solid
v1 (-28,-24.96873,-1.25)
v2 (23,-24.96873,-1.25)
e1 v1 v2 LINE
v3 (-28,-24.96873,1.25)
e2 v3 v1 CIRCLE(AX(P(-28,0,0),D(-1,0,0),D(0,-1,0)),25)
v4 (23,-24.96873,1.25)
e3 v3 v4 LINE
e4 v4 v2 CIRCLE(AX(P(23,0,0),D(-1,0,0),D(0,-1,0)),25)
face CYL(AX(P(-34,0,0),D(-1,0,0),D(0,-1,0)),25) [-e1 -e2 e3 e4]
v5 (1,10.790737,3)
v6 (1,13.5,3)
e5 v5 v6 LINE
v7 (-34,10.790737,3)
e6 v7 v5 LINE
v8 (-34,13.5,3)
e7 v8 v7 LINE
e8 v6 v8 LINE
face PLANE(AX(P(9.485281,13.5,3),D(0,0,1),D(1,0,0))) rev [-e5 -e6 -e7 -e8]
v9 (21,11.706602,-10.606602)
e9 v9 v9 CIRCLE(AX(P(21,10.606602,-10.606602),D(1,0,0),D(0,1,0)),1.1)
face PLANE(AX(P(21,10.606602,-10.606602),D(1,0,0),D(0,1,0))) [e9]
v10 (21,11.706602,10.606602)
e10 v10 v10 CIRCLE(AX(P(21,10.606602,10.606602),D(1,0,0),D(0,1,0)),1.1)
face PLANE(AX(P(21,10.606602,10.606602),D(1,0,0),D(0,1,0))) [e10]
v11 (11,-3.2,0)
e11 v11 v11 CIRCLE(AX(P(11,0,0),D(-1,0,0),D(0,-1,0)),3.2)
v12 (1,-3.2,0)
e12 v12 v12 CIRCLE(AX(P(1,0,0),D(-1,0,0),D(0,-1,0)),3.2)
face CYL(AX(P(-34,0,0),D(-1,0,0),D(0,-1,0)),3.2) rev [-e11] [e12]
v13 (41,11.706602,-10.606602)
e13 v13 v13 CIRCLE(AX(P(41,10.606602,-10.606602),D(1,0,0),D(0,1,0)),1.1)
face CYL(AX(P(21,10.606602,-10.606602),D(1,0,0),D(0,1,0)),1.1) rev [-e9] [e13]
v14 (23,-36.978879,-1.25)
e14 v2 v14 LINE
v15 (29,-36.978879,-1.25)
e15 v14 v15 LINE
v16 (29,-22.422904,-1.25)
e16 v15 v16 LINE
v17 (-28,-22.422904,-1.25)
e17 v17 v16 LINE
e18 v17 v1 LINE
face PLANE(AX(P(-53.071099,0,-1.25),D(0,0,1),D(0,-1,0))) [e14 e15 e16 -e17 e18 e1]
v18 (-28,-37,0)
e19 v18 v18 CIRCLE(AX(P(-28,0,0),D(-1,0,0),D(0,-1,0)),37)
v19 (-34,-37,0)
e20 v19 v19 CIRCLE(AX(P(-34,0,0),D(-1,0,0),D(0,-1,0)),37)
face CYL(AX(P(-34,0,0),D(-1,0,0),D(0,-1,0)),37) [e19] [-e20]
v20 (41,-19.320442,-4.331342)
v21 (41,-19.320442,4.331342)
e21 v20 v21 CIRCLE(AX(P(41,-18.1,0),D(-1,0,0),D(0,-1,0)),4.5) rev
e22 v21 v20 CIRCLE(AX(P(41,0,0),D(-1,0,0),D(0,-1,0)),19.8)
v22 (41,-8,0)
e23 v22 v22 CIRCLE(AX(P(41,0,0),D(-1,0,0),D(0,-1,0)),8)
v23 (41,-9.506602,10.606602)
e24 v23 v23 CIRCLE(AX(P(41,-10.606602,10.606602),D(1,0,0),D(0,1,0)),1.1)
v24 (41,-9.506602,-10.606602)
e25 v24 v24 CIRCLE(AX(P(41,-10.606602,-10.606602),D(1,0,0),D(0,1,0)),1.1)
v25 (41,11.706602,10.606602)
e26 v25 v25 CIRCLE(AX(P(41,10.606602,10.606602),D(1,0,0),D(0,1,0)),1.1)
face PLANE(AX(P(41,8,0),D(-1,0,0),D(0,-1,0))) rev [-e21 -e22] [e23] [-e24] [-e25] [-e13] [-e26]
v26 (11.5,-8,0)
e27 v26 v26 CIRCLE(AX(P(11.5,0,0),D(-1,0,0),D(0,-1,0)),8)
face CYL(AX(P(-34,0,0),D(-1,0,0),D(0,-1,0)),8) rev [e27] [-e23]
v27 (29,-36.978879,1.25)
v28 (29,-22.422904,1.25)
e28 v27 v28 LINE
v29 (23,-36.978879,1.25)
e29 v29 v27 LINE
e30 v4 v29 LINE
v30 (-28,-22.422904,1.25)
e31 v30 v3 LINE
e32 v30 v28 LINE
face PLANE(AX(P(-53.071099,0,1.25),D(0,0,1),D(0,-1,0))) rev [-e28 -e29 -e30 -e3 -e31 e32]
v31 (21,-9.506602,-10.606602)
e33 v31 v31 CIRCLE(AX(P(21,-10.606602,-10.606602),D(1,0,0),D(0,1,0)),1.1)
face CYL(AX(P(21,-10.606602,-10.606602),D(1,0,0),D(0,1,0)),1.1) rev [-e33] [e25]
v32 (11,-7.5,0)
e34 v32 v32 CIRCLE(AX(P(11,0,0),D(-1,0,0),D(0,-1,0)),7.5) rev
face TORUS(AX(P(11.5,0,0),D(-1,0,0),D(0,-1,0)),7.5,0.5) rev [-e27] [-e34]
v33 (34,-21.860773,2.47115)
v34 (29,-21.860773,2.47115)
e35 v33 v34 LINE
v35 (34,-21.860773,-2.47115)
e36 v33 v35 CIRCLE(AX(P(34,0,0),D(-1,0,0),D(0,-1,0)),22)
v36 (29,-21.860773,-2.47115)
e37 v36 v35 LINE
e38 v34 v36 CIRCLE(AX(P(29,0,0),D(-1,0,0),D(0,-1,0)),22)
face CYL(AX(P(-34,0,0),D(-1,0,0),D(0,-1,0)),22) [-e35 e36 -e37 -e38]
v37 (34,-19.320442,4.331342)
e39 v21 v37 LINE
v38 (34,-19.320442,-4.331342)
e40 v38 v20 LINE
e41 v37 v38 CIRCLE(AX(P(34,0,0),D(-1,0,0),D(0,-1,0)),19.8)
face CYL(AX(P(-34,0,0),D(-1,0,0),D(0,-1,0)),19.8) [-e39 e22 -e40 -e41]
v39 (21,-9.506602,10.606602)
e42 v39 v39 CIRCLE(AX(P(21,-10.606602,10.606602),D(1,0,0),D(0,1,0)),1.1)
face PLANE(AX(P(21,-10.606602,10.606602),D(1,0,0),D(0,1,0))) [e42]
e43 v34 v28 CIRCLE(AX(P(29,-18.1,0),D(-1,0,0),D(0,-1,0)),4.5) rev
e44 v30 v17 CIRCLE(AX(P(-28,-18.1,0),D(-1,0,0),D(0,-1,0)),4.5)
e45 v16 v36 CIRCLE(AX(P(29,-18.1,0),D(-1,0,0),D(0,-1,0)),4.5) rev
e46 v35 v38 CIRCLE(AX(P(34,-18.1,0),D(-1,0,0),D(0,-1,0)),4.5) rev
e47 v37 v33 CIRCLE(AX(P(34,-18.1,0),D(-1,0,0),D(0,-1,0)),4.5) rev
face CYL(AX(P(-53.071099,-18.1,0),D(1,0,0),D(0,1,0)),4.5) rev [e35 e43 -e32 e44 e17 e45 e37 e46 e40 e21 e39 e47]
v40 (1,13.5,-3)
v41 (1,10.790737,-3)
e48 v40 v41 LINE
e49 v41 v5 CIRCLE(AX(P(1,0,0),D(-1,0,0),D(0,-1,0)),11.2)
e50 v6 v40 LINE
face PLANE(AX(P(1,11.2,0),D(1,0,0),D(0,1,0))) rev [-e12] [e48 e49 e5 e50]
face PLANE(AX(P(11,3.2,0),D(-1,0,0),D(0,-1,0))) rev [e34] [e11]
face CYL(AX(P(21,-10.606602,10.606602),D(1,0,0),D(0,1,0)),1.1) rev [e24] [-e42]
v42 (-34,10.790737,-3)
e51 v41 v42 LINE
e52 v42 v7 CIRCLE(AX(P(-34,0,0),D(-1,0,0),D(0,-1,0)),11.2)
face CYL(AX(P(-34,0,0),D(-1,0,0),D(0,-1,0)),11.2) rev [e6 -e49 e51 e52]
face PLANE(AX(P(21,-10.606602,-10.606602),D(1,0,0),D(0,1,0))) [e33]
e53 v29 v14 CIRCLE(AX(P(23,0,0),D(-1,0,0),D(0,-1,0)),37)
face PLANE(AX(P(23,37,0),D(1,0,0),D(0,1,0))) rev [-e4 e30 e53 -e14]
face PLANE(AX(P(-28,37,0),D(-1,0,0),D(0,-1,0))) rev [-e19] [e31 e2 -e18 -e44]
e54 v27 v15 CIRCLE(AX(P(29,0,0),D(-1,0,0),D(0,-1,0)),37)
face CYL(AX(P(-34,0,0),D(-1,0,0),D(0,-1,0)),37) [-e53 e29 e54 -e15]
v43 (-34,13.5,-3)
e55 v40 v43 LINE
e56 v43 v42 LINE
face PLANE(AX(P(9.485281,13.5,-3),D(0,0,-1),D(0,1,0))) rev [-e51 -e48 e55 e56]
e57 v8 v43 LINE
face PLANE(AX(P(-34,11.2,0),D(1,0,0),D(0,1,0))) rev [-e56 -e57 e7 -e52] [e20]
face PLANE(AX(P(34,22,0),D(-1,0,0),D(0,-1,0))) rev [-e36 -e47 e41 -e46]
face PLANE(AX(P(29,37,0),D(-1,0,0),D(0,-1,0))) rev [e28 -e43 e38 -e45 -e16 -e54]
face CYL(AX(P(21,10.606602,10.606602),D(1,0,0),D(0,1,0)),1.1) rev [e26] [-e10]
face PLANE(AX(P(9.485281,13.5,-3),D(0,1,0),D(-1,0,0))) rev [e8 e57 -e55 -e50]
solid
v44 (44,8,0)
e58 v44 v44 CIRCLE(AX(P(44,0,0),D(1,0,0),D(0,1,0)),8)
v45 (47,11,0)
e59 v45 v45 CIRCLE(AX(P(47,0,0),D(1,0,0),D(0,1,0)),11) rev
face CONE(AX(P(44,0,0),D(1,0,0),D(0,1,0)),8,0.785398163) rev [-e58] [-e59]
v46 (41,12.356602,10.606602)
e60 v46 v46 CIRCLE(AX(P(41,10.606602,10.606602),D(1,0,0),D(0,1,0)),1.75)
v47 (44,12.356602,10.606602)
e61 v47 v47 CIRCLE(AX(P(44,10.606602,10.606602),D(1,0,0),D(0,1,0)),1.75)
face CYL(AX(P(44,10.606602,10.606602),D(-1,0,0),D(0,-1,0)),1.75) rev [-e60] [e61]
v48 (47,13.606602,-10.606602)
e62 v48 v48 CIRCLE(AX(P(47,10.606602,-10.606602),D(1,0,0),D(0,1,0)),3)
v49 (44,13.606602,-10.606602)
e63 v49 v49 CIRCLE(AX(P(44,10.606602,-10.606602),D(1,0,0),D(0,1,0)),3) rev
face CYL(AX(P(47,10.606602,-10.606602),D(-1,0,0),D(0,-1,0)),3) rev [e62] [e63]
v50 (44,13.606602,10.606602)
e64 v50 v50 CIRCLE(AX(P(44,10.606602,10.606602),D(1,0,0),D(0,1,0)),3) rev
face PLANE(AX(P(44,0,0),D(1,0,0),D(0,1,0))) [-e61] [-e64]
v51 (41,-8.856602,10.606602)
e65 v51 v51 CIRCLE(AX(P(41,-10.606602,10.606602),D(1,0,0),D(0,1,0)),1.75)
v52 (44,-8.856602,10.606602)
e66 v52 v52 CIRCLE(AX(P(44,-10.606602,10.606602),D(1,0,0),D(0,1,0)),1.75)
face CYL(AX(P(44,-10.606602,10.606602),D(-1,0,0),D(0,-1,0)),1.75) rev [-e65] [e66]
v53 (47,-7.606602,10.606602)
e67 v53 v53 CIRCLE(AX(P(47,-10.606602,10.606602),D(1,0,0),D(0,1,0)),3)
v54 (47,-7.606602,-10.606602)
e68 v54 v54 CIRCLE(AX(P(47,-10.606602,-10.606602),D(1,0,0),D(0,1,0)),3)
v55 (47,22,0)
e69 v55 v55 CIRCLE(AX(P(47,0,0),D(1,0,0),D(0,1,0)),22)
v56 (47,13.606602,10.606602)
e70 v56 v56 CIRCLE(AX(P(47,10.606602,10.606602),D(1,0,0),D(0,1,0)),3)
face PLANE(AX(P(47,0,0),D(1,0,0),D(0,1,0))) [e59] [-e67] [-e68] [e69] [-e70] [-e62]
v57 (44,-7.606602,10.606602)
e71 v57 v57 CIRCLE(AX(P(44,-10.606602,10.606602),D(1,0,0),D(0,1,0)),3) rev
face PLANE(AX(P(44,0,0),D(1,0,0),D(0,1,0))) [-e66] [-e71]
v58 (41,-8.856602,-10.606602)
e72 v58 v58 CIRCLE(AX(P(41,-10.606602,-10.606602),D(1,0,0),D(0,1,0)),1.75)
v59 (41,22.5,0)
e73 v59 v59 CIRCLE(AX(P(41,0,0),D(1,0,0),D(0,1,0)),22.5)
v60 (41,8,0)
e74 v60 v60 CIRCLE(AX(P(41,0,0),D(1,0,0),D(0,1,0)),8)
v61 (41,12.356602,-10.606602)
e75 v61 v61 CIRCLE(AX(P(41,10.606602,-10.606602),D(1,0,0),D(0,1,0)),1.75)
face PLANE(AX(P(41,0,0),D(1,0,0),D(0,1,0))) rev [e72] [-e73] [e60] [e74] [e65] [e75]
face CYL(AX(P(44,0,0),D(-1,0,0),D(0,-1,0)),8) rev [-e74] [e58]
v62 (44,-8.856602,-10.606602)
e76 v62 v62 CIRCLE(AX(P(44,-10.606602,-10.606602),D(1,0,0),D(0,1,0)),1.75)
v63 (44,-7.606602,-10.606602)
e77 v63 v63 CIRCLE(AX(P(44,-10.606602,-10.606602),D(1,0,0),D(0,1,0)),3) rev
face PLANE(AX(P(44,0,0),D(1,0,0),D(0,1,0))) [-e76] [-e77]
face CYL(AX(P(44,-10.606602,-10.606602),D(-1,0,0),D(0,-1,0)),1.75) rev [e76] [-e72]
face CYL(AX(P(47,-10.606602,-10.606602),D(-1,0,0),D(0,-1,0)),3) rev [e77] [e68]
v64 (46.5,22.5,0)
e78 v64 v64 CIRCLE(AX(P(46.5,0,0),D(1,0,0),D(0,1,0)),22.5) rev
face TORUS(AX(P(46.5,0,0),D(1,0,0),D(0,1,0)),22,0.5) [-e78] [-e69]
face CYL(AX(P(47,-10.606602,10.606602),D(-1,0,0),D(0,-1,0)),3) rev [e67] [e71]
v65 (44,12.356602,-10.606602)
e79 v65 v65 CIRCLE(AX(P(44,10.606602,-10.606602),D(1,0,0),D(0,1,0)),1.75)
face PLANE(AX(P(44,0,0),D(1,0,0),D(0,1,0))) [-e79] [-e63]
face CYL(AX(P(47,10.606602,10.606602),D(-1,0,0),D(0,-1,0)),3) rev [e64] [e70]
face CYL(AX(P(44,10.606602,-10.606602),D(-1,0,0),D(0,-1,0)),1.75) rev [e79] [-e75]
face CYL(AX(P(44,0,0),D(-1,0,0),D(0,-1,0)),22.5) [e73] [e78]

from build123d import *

# Parameters (mm, degrees)
SKETCH_5_W             = 6
SKETCH_5_H             = 6
CUT_EXTRUDE_3_DEPTH    = 35
CUT_EXTRUDE_2543_DEPTH = 69
SKETCH_11_R            = 1.1
CUT_EXTRUDE_8_DEPTH    = 20
SKETCH_12_R            = 22.5
SKETCH_12_R_2          = 8
SKETCH_12_R_3          = 1.75
EXTRUDE_1_DEPTH        = 3
SKETCH_13_R            = 22.5
SKETCH_13_R_2          = 3
SKETCH_13_R_3          = 8
EXTRUDE_2_DEPTH        = 3
FILLET_1_R             = 0.5
CHAMFER_1_SIZE         = 3
FILLET_2_R             = 0.5


# Read off the part's stored shape, not the designer's step: ピン穴
with BuildPart() as part:
    # ｽｹｯﾁ4 → 回転1 (revolve)
    with BuildSketch(Plane.XY, mode=Mode.PRIVATE) as revolve_1_sk:
        Polygon((-34, 11.2), (-34, 37), (-28, 37), (-28, 25), (23, 25), (23, 37), (29, 37), (29, 22), (34, 22), (34, 19.8), (41, 19.8), (41, 8), (11, 8), (11, 3.2), (1, 3.2), (1, 11.2), align=None)
    revolve(revolve_1_sk.sketch.rotate(Axis((-34, 0, 0), (1, 0, 0)), 180), axis=Axis((-34, 0, 0), (1, 0, 0)))

    # ｽｹｯﾁ5 → ｶｯﾄ - 押し出し3 (cut)
    with BuildSketch(Plane.ZY.offset(34)):
        with Locations((0, 10.5)):
            Rectangle(SKETCH_5_W, SKETCH_5_H)
    extrude(amount=-CUT_EXTRUDE_3_DEPTH, mode=Mode.SUBTRACT)

    # Cut-Extrude 2543 outline → Cut-Extrude 2543 (cut)
    with BuildSketch(Plane.ZY.offset(-41)):
        with BuildLine():
            ThreePointArc((-1.25, -36.978879107), (0, -37), (1.25, -36.978879107))
            Line((1.25, -36.978879107), (1.25, -22.422904116))
            ThreePointArc((1.25, -22.422904116), (0, -13.6), (-1.25, -22.422904116))
            Line((-1.25, -22.422904116), (-1.25, -36.978879107))
        make_face()
    extrude(amount=CUT_EXTRUDE_2543_DEPTH, mode=Mode.SUBTRACT)

    # ｽｹｯﾁ11 → ｶｯﾄ - 押し出し8 (cut)
    with BuildSketch(Plane(origin=(41, 0, 0), x_dir=(0, 0, -1), z_dir=(1, 0, 0))):
        with Locations(Location((-10.606601718, 10.606601718, 0), (0, 0, 90))):
            Circle(SKETCH_11_R)
        with Locations(Location((-10.606601718, -10.606601718, 0), (0, 0, 90))):
            Circle(SKETCH_11_R)
        with Locations(Location((10.606601718, 10.606601718, 0), (0, 0, 90))):
            Circle(SKETCH_11_R)
        with Locations(Location((10.606601718, -10.606601718, 0), (0, 0, 90))):
            Circle(SKETCH_11_R)
    extrude(amount=-CUT_EXTRUDE_8_DEPTH, mode=Mode.SUBTRACT)

    # ﾌｨﾚｯﾄ2
    fillet_2_edges = [part.edges().sort_by_distance(p)[0] for p in [
        (11, 8, 0),
    ]]
    fillet(fillet_2_edges, radius=FILLET_2_R)


with BuildPart() as body_2:
    # ｽｹｯﾁ12 → ﾎﾞｽ - 押し出し1 (new body)
    with BuildSketch(Plane(origin=(41, 0, 0), x_dir=(0, 0, -1), z_dir=(1, 0, 0))):
        with Locations(Location((0, 0, 0), (0, 0, 90))):
            Circle(SKETCH_12_R)
        with Locations(Location((0, 0, 0), (0, 0, 90))):
            Circle(SKETCH_12_R_2, mode=Mode.SUBTRACT)
        with Locations(Location((-10.606601718, 10.606601718, 0), (0, 0, 90))):
            Circle(SKETCH_12_R_3, mode=Mode.SUBTRACT)
        with Locations(Location((10.606601718, 10.606601718, 0), (0, 0, 90))):
            Circle(SKETCH_12_R_3, mode=Mode.SUBTRACT)
        with Locations(Location((10.606601718, -10.606601718, 0), (0, 0, 90))):
            Circle(SKETCH_12_R_3, mode=Mode.SUBTRACT)
        with Locations(Location((-10.606601718, -10.606601718, 0), (0, 0, 90))):
            Circle(SKETCH_12_R_3, mode=Mode.SUBTRACT)
    extrude(amount=EXTRUDE_1_DEPTH)

    # ｽｹｯﾁ13 → ﾎﾞｽ - 押し出し2 (add)
    with BuildSketch(Plane(origin=(44, 0, 0), x_dir=(0, 0, -1), z_dir=(1, 0, 0))):
        with Locations(Location((0, 0, 0), (0, 0, 90))):
            Circle(SKETCH_13_R)
        with Locations(Location((-10.606601718, 10.606601718, 0), (0, 0, 90))):
            Circle(SKETCH_13_R_2, mode=Mode.SUBTRACT)
        with Locations(Location((-10.606601718, -10.606601718, 0), (0, 0, 90))):
            Circle(SKETCH_13_R_2, mode=Mode.SUBTRACT)
        with Locations(Location((10.606601718, 10.606601718, 0), (0, 0, 90))):
            Circle(SKETCH_13_R_2, mode=Mode.SUBTRACT)
        with Locations(Location((10.606601718, -10.606601718, 0), (0, 0, 90))):
            Circle(SKETCH_13_R_2, mode=Mode.SUBTRACT)
        with Locations(Location((0, 0, 0), (0, 0, 90))):
            Circle(SKETCH_13_R_3, mode=Mode.SUBTRACT)
    extrude(amount=EXTRUDE_2_DEPTH)

    # ﾌｨﾚｯﾄ1
    fillet_1_edges = [body_2.edges().sort_by_distance(p)[0] for p in [
        (47, -22.5, 0),
    ]]
    fillet(fillet_1_edges, radius=FILLET_1_R)

    # 面取り1
    chamfer_1_edges = [body_2.edges().sort_by_distance(p)[0] for p in [
        (47, -8, 0),
    ]]
    chamfer(chamfer_1_edges, length=CHAMFER_1_SIZE)


solid = Compound([part.part, body_2.part])
